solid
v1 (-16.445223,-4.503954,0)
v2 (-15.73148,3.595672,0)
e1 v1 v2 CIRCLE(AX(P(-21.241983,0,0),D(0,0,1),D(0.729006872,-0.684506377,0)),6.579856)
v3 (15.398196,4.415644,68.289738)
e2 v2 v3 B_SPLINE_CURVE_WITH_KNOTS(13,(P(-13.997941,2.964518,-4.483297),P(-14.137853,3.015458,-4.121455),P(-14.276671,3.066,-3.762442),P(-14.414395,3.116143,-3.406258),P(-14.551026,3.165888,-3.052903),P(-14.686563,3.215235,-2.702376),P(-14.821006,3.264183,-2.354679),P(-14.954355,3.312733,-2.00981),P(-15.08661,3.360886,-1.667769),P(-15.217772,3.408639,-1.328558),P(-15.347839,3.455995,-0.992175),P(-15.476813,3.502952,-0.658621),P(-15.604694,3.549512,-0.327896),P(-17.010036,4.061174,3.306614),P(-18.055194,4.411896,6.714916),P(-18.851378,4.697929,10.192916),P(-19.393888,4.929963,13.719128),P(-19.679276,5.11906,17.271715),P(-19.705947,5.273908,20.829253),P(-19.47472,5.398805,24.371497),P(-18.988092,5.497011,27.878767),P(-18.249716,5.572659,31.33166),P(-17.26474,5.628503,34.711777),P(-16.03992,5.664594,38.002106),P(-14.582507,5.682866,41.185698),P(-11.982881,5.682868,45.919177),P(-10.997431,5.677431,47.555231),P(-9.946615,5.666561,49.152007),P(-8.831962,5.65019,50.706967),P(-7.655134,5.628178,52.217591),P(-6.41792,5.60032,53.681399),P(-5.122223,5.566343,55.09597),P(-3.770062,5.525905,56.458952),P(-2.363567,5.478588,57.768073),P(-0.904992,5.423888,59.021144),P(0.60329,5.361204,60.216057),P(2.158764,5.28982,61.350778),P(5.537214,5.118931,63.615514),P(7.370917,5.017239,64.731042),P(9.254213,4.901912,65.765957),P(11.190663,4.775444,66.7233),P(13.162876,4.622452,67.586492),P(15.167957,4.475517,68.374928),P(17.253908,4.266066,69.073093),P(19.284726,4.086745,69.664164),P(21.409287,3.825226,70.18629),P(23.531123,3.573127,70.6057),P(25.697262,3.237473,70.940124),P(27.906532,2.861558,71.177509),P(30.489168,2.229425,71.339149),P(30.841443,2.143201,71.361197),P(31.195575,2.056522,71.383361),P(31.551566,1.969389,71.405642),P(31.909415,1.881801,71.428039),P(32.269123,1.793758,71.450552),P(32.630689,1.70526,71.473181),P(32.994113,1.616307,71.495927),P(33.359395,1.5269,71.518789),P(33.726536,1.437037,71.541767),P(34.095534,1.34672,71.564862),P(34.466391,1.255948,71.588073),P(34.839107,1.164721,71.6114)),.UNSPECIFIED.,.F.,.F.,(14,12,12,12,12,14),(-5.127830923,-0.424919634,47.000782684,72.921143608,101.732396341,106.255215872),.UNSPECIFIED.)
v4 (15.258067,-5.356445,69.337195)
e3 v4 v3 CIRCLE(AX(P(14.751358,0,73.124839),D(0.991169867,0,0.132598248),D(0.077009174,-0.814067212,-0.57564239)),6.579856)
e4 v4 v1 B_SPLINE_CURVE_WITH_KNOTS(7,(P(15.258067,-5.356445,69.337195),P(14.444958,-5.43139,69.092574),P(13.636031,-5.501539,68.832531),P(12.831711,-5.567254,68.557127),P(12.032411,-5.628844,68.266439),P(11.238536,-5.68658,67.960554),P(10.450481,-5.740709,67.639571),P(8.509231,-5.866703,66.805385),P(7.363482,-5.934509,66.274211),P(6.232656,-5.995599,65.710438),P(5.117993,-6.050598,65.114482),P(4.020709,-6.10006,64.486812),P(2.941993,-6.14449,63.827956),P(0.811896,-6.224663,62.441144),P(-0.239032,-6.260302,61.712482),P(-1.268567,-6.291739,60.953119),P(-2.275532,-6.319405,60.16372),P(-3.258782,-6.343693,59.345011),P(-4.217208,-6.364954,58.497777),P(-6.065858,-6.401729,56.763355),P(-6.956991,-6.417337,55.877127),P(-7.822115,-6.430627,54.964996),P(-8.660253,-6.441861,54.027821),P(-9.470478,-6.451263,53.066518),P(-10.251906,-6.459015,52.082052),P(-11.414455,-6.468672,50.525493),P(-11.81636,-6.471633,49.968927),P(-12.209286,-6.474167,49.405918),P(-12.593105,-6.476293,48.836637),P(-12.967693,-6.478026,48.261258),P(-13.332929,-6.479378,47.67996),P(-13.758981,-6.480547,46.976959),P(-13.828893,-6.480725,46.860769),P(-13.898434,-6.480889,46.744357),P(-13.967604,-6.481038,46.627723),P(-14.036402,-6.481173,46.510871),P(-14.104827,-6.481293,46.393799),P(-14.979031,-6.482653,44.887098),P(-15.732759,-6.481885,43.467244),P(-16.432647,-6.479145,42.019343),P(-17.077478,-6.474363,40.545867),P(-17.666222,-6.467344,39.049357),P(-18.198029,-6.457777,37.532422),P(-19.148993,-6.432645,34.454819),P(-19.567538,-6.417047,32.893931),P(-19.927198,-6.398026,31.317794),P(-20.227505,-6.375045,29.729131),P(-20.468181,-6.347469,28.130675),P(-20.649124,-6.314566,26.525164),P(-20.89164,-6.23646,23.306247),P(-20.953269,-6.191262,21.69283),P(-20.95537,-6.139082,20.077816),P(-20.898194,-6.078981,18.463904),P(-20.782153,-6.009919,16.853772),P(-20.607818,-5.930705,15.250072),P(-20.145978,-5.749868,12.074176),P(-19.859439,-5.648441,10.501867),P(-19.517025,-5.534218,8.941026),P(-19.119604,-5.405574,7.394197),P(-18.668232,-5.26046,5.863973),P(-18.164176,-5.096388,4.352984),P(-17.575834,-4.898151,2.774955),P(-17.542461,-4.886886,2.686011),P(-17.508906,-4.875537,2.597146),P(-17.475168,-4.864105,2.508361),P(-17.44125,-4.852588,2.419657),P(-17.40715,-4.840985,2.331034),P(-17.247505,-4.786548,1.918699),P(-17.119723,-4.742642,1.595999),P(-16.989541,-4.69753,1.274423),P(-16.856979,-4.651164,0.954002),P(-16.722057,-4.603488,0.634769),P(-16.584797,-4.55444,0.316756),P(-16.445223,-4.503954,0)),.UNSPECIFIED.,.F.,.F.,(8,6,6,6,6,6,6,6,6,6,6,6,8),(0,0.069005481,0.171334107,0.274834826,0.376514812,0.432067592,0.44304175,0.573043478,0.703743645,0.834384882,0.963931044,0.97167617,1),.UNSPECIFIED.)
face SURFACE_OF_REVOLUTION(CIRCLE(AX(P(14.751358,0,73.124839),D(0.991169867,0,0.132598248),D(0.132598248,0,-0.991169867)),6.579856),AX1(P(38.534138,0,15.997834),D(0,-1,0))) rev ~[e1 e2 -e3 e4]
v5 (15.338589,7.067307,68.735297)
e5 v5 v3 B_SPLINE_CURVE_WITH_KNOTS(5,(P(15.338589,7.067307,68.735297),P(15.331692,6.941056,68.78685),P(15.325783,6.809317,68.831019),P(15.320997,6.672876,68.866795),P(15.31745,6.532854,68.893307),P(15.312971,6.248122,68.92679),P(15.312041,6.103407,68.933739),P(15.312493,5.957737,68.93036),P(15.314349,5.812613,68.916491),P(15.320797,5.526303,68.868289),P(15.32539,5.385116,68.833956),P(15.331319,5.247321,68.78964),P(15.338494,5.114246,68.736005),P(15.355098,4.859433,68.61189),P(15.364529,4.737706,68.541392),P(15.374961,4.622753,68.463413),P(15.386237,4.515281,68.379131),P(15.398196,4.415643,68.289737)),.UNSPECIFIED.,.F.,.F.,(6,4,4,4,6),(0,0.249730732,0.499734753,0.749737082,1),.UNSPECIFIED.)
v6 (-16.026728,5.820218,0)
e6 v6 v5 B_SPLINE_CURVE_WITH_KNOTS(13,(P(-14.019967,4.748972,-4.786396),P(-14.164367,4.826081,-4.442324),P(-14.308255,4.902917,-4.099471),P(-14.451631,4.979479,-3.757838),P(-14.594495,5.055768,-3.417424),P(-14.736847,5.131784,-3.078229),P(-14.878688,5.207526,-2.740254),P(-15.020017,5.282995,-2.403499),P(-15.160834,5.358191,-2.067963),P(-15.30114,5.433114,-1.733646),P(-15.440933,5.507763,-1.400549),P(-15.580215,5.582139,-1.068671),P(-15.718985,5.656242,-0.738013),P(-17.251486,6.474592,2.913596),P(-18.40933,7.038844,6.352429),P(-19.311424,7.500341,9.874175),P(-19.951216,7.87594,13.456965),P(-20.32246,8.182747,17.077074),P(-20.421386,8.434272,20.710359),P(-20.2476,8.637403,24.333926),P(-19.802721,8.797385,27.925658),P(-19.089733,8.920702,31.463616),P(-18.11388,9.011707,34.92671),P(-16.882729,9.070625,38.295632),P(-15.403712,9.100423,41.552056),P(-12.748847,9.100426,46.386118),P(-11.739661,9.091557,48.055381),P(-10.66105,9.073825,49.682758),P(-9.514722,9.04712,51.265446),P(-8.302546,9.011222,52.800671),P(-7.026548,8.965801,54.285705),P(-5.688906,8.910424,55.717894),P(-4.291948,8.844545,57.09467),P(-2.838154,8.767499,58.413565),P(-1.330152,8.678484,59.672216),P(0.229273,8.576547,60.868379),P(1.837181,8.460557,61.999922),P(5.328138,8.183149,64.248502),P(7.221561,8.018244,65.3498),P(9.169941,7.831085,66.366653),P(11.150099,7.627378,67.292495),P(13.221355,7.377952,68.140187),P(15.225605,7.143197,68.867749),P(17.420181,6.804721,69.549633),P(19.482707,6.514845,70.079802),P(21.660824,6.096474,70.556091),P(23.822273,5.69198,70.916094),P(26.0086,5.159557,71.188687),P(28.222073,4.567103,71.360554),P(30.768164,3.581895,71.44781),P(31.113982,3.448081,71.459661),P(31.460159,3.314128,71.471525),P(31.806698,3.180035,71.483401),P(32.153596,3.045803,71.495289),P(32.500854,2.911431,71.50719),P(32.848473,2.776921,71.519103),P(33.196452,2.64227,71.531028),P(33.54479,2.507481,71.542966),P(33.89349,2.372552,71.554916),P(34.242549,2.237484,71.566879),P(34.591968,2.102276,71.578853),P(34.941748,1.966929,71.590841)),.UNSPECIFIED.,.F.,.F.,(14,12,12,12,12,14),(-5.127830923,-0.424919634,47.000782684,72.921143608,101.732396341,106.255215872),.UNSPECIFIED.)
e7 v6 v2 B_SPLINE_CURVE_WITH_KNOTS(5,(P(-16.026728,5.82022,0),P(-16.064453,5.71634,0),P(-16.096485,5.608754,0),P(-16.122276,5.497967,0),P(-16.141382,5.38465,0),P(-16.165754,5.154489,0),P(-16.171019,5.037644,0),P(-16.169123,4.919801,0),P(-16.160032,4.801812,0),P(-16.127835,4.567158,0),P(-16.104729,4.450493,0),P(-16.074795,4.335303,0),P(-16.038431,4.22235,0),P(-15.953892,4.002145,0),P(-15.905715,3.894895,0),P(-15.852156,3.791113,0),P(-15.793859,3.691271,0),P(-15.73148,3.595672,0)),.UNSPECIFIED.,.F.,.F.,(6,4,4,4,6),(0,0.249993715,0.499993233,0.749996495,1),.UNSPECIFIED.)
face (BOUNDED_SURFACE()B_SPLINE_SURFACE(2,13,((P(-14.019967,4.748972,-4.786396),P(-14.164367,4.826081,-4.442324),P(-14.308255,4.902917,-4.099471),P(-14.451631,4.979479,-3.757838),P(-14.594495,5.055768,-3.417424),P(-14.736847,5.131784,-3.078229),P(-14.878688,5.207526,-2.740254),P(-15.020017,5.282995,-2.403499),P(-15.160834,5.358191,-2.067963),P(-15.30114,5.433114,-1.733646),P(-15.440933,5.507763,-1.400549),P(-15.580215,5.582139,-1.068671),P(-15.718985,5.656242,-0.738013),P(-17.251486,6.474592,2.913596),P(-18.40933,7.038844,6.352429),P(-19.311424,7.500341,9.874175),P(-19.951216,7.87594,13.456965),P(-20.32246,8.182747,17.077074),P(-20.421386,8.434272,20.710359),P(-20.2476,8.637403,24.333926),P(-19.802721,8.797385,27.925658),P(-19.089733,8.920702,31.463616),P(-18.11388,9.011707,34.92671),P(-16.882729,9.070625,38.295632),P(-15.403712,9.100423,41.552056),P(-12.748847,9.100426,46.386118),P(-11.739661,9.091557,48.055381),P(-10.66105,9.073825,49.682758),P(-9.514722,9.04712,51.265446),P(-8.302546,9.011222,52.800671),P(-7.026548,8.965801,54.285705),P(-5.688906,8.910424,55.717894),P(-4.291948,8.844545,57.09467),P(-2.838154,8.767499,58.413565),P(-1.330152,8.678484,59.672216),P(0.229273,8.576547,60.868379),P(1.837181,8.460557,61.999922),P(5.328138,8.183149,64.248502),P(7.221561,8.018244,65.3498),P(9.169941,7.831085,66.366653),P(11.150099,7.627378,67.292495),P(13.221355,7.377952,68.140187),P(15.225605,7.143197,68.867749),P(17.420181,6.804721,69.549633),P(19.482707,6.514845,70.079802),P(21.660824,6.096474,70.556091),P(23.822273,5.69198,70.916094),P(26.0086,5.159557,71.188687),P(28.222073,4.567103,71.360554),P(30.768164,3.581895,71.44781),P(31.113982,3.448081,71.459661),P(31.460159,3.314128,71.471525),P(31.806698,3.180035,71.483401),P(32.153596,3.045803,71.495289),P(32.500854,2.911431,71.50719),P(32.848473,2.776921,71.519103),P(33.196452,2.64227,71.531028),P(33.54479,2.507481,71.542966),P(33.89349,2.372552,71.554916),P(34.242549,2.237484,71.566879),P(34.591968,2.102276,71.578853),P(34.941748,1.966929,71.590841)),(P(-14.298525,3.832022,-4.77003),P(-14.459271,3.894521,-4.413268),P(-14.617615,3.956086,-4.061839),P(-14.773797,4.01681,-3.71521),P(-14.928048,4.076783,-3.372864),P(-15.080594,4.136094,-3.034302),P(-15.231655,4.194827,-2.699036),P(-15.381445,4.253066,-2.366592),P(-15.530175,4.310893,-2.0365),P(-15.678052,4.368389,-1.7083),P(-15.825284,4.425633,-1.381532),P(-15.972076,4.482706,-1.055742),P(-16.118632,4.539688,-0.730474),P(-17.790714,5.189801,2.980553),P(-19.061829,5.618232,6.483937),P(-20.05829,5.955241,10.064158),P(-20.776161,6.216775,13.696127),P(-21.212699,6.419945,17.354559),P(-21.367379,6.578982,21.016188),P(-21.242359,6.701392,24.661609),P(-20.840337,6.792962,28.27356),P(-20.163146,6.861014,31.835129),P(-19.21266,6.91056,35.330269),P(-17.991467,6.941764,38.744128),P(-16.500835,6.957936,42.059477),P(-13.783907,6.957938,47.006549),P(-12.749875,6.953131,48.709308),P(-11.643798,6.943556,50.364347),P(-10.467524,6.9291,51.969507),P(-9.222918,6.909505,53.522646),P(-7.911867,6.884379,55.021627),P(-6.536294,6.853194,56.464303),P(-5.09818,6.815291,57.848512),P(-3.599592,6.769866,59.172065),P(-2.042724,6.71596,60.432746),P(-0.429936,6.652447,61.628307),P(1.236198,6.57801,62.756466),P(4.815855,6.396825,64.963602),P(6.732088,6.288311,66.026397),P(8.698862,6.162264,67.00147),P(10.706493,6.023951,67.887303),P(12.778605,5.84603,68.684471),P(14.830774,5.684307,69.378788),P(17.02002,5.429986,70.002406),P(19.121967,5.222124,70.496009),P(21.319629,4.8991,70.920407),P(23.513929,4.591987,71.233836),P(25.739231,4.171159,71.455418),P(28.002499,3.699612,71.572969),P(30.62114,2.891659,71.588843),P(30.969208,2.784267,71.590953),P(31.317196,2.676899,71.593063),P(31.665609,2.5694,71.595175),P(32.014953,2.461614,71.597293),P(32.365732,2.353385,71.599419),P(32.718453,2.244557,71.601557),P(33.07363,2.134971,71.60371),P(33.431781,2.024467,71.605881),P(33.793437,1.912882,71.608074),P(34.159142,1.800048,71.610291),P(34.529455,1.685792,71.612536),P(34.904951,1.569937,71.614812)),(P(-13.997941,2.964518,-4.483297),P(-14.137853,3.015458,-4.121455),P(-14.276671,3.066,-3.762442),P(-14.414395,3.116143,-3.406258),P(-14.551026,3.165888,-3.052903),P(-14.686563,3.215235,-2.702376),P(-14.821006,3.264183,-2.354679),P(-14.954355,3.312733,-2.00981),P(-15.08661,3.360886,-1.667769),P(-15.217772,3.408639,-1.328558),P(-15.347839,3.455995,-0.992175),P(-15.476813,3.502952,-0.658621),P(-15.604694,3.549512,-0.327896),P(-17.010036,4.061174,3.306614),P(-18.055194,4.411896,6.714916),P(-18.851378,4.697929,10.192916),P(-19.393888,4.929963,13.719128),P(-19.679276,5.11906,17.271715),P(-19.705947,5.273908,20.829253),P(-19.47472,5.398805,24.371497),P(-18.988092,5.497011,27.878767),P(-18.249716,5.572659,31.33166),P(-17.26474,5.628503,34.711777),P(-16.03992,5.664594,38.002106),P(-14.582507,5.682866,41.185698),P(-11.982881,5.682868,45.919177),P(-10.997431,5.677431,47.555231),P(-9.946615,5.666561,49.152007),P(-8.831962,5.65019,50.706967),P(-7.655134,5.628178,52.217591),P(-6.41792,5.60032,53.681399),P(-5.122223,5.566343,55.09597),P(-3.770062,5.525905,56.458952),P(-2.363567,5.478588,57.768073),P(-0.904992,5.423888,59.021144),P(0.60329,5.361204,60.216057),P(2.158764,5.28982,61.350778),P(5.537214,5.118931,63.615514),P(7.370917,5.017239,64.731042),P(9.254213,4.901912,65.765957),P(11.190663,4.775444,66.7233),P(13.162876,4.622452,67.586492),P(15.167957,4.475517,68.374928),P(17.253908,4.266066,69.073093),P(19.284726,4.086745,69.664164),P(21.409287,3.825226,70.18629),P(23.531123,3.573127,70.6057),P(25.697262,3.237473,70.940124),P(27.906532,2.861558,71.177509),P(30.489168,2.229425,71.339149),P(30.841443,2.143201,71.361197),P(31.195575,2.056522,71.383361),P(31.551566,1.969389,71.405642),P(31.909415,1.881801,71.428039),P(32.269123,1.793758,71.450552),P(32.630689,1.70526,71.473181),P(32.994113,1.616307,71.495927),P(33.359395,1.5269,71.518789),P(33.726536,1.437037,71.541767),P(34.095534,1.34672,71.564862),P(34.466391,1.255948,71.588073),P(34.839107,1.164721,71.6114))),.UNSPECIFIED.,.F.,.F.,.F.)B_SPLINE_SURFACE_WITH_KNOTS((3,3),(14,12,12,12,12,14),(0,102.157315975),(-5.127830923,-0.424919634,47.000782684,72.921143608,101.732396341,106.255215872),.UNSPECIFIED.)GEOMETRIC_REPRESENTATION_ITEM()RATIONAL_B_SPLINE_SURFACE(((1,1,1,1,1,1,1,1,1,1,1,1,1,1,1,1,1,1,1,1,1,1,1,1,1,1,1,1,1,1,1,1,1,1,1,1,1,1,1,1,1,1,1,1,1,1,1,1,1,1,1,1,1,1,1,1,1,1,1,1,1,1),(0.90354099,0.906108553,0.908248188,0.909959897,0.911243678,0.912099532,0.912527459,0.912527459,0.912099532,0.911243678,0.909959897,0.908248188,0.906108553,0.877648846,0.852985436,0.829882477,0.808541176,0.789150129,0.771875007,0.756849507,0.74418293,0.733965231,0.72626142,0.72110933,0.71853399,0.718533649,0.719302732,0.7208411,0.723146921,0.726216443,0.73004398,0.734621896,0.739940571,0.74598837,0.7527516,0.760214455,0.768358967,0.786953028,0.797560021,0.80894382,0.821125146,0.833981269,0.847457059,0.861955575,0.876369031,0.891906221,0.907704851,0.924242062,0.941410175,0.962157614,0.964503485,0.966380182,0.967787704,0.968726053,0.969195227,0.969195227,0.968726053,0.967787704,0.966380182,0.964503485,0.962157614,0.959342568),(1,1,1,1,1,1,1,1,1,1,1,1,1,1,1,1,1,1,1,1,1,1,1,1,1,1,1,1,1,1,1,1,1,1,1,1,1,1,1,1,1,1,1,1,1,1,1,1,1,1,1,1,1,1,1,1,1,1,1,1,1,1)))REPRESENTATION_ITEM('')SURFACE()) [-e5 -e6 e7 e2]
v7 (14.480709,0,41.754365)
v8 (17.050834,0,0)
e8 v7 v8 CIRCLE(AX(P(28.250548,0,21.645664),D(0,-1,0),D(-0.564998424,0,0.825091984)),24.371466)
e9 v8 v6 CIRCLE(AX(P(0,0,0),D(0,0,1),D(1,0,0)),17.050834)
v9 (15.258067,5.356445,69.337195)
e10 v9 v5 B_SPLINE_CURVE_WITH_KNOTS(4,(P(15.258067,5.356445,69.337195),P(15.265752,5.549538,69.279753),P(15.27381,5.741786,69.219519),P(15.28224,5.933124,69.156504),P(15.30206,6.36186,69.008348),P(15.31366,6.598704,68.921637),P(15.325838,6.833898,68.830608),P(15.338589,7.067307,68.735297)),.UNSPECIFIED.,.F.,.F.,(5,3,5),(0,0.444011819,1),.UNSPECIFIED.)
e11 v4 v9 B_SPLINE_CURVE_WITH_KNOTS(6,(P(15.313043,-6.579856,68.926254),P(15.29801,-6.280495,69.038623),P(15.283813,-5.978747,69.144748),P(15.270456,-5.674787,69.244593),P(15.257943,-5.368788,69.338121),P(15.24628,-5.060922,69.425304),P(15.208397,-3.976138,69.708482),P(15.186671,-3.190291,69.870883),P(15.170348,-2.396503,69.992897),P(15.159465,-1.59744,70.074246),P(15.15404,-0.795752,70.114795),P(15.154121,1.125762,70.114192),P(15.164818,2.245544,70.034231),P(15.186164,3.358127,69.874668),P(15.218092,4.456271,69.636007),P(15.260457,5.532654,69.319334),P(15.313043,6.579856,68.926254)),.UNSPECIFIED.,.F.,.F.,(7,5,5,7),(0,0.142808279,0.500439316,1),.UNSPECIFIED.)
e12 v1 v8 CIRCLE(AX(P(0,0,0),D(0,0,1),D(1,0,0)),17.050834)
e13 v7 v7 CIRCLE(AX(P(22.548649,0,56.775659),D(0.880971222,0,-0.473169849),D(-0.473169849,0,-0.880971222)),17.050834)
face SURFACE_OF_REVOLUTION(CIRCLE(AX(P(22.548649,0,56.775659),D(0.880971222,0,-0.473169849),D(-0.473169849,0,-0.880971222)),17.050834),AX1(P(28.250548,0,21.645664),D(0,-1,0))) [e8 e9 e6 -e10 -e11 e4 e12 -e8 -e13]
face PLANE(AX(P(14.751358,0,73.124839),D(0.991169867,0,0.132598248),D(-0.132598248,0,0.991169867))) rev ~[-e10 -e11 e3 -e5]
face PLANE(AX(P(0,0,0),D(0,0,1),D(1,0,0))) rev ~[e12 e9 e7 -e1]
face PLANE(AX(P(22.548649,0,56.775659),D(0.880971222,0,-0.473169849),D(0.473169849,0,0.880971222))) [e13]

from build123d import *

# Parameters (mm, degrees)
F0_R = 17.0508344958
F3_R = 6.5798562112
F6_R = 2.54


with BuildPart() as f2:
    # F2: sweep along a path in F1
    with BuildLine(Plane.XZ) as f2_path:
        ThreePointArc((22.5486494601, 56.7756593227), (-4.8260451433, 34.7821472401), (0, 0))
    # F0 (on Top) → F2 (sweep)
    with BuildSketch(Plane.XY):
        Circle(F0_R)
    sweep(path=f2_path.line)

    # F5: sweep along a path in F4
    with BuildLine(Plane.XZ) as f5_path:
        ThreePointArc((14.7513579577, 73.1248388765), (-16.9846248554, 43.3251523108), (-21.2419833988, 0))
    # F3 (on Top) → F5 (sweep, cut)
    with BuildSketch(Plane.XY):
        with Locations((-21.2419833988, 0)):
            Circle(F3_R)
    sweep(path=f5_path.line, mode=Mode.SUBTRACT)

    # F6
    f6_edges = [f2.edges().sort_by_distance(p)[0] for p in [
        (-16.429502, 6.477089, 41.900907),
    ]]
    fillet(f6_edges, radius=F6_R)


solid = f2.part
